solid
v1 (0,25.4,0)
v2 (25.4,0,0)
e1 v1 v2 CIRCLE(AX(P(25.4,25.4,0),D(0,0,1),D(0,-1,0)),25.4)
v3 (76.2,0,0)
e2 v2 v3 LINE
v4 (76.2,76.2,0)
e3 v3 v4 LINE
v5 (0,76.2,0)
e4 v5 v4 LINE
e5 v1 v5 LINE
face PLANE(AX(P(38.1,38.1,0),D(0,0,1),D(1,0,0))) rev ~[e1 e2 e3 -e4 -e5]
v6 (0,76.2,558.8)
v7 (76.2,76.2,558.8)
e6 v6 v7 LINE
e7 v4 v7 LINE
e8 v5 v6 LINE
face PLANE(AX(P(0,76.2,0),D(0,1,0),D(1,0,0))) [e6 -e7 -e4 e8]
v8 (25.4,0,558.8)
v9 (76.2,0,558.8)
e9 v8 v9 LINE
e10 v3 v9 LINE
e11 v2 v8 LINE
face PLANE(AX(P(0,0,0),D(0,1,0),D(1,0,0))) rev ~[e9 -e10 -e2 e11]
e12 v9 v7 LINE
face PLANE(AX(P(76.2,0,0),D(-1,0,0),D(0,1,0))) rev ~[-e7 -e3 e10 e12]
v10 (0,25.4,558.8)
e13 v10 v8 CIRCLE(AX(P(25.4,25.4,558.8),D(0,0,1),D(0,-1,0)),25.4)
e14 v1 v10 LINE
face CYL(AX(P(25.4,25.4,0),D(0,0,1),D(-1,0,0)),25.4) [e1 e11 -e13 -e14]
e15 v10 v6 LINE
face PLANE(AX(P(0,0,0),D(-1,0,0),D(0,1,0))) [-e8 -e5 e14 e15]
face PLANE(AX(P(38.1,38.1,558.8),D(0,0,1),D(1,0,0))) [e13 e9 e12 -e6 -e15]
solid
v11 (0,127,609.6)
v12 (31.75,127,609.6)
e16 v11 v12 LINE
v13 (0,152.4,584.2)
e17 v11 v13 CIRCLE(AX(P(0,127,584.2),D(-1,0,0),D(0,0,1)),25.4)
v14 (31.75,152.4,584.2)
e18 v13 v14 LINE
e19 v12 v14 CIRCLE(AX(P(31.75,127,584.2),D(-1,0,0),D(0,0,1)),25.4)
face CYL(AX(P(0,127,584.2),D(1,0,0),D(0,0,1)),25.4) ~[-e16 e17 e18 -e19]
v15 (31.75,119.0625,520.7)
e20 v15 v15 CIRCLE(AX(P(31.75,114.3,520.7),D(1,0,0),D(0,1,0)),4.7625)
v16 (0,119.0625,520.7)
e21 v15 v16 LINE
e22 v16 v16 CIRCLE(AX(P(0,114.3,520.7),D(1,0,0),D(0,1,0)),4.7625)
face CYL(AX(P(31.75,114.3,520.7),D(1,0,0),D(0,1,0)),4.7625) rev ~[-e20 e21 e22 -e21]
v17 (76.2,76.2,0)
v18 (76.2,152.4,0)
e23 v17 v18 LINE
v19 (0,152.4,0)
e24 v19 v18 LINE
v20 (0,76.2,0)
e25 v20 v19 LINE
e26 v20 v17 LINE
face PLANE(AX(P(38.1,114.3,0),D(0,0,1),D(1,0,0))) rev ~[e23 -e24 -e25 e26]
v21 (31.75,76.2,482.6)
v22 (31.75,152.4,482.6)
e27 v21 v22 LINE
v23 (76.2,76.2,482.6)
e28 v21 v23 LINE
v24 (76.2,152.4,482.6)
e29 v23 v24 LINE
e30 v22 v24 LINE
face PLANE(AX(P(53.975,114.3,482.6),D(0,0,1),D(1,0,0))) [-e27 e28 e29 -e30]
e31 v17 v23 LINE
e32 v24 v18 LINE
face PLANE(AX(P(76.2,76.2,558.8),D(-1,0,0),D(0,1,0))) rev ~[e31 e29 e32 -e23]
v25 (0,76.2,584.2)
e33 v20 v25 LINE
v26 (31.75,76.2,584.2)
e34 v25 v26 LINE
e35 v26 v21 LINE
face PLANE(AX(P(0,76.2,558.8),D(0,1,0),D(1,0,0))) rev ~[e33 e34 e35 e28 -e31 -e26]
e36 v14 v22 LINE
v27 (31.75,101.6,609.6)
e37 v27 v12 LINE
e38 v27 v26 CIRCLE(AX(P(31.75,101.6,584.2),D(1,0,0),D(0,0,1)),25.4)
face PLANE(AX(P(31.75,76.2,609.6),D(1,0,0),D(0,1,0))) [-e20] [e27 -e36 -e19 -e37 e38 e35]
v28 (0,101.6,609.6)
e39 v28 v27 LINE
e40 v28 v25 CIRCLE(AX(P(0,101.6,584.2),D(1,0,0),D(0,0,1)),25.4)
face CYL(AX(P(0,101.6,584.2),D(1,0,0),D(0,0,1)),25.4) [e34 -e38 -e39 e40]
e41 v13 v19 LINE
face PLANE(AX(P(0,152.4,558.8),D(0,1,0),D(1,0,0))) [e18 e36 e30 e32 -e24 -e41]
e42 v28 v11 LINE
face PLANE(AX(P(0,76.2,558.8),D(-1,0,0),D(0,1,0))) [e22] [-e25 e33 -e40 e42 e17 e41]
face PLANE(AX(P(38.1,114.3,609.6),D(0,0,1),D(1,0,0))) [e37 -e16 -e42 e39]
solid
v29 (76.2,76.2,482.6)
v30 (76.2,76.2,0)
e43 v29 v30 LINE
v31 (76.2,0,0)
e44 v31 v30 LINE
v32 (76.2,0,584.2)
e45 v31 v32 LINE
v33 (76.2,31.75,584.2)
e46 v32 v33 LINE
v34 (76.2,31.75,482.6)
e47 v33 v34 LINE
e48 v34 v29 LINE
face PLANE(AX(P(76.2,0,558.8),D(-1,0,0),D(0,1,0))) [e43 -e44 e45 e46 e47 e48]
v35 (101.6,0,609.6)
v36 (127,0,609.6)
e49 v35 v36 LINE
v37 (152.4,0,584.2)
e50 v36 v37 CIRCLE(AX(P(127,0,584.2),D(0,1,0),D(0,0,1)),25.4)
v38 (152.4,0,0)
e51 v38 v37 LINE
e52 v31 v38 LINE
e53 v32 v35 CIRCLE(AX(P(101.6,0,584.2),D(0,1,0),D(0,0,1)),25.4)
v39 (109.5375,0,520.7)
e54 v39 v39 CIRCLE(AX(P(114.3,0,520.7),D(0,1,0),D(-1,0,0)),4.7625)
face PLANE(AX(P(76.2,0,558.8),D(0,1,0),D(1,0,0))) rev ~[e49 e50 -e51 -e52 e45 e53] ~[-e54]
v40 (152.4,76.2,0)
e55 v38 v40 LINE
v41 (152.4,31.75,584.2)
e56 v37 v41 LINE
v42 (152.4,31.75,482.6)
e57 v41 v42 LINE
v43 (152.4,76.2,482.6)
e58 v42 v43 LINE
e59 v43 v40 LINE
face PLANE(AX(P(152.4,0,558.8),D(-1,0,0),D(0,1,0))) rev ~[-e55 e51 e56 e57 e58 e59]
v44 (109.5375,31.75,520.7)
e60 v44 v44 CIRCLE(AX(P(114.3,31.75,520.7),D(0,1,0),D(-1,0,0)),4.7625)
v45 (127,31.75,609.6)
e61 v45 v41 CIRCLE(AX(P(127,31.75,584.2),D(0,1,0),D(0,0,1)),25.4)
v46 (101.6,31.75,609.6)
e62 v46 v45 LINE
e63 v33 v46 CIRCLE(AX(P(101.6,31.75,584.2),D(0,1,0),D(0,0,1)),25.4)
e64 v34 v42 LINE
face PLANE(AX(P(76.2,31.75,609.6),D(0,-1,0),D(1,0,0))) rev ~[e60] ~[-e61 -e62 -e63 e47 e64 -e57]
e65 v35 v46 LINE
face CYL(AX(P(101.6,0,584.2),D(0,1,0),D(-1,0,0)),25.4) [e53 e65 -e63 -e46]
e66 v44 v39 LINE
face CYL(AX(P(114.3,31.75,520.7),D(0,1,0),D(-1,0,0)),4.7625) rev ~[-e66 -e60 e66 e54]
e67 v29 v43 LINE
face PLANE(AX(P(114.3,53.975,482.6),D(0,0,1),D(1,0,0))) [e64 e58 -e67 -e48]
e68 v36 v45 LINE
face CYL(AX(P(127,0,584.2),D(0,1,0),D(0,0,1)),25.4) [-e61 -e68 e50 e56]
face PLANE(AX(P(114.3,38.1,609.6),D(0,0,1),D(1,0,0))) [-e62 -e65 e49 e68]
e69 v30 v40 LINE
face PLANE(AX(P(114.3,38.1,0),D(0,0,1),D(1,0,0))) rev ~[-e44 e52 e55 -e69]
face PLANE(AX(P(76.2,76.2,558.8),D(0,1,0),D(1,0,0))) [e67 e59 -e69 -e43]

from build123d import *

# Parameters (mm, degrees)
F0_W      = 76.2
F0_H      = 76.2
F1_DEPTH  = 558.8
F4_DEPTH  = 50.8
F5_DEPTH  = 50.8
F6_W      = 44.45
F6_H      = 76.2
F7_DEPTH  = 127
F8_W      = 76.2
F8_H      = 44.45
F9_DEPTH  = 127
F10_R     = 25.4
F10_2_R   = 25.4
F10_3_R   = 25.4
F11_R     = 4.7625
F12_DEPTH = 31.751
F13_R     = 4.7625
F14_DEPTH = 31.751


with BuildPart() as f1:
    # F0 (on Top) → F1 (new body)
    with BuildSketch(Plane.XY):
        with Locations((38.1, 38.1)):
            Rectangle(F0_W, F0_H)
    extrude(amount=F1_DEPTH)


with BuildPart() as f2_1:
    # F2: copy of F1
    add(f1.part.moved(Location((76.2, 0, 0))))

    # F5 (add): a face of the model
    f5_faces = [f2_1.faces().sort_by_distance(p)[0] for p in [
        (114.3, 38.1, 558.8),
    ]]
    extrude(f5_faces, amount=F5_DEPTH)

    # F8 (on face) → F9 (cut)
    with BuildSketch(Plane.XY.offset(609.6)):
        with Locations((114.3, 53.975)):
            Rectangle(F8_W, F8_H)
    extrude(amount=-F9_DEPTH, mode=Mode.SUBTRACT)

    # F10#2
    f10_2_edges = [f2_1.edges().sort_by_distance(p)[0] for p in [
        (76.2, 15.875, 609.6),
        (152.4, 15.875, 609.6),
    ]]
    fillet(f10_2_edges, radius=F10_2_R)

    # F13 (on face) → F14 (cut, through all)
    with BuildSketch(Plane(origin=(0, 31.75, 0), x_dir=(-1, 0, 0), z_dir=(0, 1, 0))):
        with Locations((-114.3, 520.7)):
            Circle(F13_R)
    extrude(amount=-F14_DEPTH, mode=Mode.SUBTRACT)


with BuildPart() as f3_1:
    # F3: copy of F1
    add(f1.part.moved(Location((0, 76.2, 0))))

    # F4 (add): a face of the model
    f4_faces = [f3_1.faces().sort_by_distance(p)[0] for p in [
        (38.1, 114.3, 558.8),
    ]]
    extrude(f4_faces, amount=F4_DEPTH)

    # F6 (on face) → F7 (cut)
    with BuildSketch(Plane.XY.offset(609.6)):
        with Locations((53.975, 114.3)):
            Rectangle(F6_W, F6_H)
    extrude(amount=-F7_DEPTH, mode=Mode.SUBTRACT)

    # F10#3
    f10_3_edges = [f3_1.edges().sort_by_distance(p)[0] for p in [
        (15.875, 76.2, 609.6),
        (15.875, 152.4, 609.6),
    ]]
    fillet(f10_3_edges, radius=F10_3_R)

    # F11 (on face) → F12 (cut, through all)
    with BuildSketch(Plane.YZ.offset(31.75)):
        with Locations((114.3, 520.7)):
            Circle(F11_R)
    extrude(amount=-F12_DEPTH, mode=Mode.SUBTRACT)


with BuildPart() as f1_1:
    add(f1.part)

    # F10
    f10_edges = [f1_1.edges().sort_by_distance(p)[0] for p in [
        (0, 0, 279.4),
    ]]
    fillet(f10_edges, radius=F10_R)


solid = Compound([f2_1.part, f3_1.part, f1_1.part])
